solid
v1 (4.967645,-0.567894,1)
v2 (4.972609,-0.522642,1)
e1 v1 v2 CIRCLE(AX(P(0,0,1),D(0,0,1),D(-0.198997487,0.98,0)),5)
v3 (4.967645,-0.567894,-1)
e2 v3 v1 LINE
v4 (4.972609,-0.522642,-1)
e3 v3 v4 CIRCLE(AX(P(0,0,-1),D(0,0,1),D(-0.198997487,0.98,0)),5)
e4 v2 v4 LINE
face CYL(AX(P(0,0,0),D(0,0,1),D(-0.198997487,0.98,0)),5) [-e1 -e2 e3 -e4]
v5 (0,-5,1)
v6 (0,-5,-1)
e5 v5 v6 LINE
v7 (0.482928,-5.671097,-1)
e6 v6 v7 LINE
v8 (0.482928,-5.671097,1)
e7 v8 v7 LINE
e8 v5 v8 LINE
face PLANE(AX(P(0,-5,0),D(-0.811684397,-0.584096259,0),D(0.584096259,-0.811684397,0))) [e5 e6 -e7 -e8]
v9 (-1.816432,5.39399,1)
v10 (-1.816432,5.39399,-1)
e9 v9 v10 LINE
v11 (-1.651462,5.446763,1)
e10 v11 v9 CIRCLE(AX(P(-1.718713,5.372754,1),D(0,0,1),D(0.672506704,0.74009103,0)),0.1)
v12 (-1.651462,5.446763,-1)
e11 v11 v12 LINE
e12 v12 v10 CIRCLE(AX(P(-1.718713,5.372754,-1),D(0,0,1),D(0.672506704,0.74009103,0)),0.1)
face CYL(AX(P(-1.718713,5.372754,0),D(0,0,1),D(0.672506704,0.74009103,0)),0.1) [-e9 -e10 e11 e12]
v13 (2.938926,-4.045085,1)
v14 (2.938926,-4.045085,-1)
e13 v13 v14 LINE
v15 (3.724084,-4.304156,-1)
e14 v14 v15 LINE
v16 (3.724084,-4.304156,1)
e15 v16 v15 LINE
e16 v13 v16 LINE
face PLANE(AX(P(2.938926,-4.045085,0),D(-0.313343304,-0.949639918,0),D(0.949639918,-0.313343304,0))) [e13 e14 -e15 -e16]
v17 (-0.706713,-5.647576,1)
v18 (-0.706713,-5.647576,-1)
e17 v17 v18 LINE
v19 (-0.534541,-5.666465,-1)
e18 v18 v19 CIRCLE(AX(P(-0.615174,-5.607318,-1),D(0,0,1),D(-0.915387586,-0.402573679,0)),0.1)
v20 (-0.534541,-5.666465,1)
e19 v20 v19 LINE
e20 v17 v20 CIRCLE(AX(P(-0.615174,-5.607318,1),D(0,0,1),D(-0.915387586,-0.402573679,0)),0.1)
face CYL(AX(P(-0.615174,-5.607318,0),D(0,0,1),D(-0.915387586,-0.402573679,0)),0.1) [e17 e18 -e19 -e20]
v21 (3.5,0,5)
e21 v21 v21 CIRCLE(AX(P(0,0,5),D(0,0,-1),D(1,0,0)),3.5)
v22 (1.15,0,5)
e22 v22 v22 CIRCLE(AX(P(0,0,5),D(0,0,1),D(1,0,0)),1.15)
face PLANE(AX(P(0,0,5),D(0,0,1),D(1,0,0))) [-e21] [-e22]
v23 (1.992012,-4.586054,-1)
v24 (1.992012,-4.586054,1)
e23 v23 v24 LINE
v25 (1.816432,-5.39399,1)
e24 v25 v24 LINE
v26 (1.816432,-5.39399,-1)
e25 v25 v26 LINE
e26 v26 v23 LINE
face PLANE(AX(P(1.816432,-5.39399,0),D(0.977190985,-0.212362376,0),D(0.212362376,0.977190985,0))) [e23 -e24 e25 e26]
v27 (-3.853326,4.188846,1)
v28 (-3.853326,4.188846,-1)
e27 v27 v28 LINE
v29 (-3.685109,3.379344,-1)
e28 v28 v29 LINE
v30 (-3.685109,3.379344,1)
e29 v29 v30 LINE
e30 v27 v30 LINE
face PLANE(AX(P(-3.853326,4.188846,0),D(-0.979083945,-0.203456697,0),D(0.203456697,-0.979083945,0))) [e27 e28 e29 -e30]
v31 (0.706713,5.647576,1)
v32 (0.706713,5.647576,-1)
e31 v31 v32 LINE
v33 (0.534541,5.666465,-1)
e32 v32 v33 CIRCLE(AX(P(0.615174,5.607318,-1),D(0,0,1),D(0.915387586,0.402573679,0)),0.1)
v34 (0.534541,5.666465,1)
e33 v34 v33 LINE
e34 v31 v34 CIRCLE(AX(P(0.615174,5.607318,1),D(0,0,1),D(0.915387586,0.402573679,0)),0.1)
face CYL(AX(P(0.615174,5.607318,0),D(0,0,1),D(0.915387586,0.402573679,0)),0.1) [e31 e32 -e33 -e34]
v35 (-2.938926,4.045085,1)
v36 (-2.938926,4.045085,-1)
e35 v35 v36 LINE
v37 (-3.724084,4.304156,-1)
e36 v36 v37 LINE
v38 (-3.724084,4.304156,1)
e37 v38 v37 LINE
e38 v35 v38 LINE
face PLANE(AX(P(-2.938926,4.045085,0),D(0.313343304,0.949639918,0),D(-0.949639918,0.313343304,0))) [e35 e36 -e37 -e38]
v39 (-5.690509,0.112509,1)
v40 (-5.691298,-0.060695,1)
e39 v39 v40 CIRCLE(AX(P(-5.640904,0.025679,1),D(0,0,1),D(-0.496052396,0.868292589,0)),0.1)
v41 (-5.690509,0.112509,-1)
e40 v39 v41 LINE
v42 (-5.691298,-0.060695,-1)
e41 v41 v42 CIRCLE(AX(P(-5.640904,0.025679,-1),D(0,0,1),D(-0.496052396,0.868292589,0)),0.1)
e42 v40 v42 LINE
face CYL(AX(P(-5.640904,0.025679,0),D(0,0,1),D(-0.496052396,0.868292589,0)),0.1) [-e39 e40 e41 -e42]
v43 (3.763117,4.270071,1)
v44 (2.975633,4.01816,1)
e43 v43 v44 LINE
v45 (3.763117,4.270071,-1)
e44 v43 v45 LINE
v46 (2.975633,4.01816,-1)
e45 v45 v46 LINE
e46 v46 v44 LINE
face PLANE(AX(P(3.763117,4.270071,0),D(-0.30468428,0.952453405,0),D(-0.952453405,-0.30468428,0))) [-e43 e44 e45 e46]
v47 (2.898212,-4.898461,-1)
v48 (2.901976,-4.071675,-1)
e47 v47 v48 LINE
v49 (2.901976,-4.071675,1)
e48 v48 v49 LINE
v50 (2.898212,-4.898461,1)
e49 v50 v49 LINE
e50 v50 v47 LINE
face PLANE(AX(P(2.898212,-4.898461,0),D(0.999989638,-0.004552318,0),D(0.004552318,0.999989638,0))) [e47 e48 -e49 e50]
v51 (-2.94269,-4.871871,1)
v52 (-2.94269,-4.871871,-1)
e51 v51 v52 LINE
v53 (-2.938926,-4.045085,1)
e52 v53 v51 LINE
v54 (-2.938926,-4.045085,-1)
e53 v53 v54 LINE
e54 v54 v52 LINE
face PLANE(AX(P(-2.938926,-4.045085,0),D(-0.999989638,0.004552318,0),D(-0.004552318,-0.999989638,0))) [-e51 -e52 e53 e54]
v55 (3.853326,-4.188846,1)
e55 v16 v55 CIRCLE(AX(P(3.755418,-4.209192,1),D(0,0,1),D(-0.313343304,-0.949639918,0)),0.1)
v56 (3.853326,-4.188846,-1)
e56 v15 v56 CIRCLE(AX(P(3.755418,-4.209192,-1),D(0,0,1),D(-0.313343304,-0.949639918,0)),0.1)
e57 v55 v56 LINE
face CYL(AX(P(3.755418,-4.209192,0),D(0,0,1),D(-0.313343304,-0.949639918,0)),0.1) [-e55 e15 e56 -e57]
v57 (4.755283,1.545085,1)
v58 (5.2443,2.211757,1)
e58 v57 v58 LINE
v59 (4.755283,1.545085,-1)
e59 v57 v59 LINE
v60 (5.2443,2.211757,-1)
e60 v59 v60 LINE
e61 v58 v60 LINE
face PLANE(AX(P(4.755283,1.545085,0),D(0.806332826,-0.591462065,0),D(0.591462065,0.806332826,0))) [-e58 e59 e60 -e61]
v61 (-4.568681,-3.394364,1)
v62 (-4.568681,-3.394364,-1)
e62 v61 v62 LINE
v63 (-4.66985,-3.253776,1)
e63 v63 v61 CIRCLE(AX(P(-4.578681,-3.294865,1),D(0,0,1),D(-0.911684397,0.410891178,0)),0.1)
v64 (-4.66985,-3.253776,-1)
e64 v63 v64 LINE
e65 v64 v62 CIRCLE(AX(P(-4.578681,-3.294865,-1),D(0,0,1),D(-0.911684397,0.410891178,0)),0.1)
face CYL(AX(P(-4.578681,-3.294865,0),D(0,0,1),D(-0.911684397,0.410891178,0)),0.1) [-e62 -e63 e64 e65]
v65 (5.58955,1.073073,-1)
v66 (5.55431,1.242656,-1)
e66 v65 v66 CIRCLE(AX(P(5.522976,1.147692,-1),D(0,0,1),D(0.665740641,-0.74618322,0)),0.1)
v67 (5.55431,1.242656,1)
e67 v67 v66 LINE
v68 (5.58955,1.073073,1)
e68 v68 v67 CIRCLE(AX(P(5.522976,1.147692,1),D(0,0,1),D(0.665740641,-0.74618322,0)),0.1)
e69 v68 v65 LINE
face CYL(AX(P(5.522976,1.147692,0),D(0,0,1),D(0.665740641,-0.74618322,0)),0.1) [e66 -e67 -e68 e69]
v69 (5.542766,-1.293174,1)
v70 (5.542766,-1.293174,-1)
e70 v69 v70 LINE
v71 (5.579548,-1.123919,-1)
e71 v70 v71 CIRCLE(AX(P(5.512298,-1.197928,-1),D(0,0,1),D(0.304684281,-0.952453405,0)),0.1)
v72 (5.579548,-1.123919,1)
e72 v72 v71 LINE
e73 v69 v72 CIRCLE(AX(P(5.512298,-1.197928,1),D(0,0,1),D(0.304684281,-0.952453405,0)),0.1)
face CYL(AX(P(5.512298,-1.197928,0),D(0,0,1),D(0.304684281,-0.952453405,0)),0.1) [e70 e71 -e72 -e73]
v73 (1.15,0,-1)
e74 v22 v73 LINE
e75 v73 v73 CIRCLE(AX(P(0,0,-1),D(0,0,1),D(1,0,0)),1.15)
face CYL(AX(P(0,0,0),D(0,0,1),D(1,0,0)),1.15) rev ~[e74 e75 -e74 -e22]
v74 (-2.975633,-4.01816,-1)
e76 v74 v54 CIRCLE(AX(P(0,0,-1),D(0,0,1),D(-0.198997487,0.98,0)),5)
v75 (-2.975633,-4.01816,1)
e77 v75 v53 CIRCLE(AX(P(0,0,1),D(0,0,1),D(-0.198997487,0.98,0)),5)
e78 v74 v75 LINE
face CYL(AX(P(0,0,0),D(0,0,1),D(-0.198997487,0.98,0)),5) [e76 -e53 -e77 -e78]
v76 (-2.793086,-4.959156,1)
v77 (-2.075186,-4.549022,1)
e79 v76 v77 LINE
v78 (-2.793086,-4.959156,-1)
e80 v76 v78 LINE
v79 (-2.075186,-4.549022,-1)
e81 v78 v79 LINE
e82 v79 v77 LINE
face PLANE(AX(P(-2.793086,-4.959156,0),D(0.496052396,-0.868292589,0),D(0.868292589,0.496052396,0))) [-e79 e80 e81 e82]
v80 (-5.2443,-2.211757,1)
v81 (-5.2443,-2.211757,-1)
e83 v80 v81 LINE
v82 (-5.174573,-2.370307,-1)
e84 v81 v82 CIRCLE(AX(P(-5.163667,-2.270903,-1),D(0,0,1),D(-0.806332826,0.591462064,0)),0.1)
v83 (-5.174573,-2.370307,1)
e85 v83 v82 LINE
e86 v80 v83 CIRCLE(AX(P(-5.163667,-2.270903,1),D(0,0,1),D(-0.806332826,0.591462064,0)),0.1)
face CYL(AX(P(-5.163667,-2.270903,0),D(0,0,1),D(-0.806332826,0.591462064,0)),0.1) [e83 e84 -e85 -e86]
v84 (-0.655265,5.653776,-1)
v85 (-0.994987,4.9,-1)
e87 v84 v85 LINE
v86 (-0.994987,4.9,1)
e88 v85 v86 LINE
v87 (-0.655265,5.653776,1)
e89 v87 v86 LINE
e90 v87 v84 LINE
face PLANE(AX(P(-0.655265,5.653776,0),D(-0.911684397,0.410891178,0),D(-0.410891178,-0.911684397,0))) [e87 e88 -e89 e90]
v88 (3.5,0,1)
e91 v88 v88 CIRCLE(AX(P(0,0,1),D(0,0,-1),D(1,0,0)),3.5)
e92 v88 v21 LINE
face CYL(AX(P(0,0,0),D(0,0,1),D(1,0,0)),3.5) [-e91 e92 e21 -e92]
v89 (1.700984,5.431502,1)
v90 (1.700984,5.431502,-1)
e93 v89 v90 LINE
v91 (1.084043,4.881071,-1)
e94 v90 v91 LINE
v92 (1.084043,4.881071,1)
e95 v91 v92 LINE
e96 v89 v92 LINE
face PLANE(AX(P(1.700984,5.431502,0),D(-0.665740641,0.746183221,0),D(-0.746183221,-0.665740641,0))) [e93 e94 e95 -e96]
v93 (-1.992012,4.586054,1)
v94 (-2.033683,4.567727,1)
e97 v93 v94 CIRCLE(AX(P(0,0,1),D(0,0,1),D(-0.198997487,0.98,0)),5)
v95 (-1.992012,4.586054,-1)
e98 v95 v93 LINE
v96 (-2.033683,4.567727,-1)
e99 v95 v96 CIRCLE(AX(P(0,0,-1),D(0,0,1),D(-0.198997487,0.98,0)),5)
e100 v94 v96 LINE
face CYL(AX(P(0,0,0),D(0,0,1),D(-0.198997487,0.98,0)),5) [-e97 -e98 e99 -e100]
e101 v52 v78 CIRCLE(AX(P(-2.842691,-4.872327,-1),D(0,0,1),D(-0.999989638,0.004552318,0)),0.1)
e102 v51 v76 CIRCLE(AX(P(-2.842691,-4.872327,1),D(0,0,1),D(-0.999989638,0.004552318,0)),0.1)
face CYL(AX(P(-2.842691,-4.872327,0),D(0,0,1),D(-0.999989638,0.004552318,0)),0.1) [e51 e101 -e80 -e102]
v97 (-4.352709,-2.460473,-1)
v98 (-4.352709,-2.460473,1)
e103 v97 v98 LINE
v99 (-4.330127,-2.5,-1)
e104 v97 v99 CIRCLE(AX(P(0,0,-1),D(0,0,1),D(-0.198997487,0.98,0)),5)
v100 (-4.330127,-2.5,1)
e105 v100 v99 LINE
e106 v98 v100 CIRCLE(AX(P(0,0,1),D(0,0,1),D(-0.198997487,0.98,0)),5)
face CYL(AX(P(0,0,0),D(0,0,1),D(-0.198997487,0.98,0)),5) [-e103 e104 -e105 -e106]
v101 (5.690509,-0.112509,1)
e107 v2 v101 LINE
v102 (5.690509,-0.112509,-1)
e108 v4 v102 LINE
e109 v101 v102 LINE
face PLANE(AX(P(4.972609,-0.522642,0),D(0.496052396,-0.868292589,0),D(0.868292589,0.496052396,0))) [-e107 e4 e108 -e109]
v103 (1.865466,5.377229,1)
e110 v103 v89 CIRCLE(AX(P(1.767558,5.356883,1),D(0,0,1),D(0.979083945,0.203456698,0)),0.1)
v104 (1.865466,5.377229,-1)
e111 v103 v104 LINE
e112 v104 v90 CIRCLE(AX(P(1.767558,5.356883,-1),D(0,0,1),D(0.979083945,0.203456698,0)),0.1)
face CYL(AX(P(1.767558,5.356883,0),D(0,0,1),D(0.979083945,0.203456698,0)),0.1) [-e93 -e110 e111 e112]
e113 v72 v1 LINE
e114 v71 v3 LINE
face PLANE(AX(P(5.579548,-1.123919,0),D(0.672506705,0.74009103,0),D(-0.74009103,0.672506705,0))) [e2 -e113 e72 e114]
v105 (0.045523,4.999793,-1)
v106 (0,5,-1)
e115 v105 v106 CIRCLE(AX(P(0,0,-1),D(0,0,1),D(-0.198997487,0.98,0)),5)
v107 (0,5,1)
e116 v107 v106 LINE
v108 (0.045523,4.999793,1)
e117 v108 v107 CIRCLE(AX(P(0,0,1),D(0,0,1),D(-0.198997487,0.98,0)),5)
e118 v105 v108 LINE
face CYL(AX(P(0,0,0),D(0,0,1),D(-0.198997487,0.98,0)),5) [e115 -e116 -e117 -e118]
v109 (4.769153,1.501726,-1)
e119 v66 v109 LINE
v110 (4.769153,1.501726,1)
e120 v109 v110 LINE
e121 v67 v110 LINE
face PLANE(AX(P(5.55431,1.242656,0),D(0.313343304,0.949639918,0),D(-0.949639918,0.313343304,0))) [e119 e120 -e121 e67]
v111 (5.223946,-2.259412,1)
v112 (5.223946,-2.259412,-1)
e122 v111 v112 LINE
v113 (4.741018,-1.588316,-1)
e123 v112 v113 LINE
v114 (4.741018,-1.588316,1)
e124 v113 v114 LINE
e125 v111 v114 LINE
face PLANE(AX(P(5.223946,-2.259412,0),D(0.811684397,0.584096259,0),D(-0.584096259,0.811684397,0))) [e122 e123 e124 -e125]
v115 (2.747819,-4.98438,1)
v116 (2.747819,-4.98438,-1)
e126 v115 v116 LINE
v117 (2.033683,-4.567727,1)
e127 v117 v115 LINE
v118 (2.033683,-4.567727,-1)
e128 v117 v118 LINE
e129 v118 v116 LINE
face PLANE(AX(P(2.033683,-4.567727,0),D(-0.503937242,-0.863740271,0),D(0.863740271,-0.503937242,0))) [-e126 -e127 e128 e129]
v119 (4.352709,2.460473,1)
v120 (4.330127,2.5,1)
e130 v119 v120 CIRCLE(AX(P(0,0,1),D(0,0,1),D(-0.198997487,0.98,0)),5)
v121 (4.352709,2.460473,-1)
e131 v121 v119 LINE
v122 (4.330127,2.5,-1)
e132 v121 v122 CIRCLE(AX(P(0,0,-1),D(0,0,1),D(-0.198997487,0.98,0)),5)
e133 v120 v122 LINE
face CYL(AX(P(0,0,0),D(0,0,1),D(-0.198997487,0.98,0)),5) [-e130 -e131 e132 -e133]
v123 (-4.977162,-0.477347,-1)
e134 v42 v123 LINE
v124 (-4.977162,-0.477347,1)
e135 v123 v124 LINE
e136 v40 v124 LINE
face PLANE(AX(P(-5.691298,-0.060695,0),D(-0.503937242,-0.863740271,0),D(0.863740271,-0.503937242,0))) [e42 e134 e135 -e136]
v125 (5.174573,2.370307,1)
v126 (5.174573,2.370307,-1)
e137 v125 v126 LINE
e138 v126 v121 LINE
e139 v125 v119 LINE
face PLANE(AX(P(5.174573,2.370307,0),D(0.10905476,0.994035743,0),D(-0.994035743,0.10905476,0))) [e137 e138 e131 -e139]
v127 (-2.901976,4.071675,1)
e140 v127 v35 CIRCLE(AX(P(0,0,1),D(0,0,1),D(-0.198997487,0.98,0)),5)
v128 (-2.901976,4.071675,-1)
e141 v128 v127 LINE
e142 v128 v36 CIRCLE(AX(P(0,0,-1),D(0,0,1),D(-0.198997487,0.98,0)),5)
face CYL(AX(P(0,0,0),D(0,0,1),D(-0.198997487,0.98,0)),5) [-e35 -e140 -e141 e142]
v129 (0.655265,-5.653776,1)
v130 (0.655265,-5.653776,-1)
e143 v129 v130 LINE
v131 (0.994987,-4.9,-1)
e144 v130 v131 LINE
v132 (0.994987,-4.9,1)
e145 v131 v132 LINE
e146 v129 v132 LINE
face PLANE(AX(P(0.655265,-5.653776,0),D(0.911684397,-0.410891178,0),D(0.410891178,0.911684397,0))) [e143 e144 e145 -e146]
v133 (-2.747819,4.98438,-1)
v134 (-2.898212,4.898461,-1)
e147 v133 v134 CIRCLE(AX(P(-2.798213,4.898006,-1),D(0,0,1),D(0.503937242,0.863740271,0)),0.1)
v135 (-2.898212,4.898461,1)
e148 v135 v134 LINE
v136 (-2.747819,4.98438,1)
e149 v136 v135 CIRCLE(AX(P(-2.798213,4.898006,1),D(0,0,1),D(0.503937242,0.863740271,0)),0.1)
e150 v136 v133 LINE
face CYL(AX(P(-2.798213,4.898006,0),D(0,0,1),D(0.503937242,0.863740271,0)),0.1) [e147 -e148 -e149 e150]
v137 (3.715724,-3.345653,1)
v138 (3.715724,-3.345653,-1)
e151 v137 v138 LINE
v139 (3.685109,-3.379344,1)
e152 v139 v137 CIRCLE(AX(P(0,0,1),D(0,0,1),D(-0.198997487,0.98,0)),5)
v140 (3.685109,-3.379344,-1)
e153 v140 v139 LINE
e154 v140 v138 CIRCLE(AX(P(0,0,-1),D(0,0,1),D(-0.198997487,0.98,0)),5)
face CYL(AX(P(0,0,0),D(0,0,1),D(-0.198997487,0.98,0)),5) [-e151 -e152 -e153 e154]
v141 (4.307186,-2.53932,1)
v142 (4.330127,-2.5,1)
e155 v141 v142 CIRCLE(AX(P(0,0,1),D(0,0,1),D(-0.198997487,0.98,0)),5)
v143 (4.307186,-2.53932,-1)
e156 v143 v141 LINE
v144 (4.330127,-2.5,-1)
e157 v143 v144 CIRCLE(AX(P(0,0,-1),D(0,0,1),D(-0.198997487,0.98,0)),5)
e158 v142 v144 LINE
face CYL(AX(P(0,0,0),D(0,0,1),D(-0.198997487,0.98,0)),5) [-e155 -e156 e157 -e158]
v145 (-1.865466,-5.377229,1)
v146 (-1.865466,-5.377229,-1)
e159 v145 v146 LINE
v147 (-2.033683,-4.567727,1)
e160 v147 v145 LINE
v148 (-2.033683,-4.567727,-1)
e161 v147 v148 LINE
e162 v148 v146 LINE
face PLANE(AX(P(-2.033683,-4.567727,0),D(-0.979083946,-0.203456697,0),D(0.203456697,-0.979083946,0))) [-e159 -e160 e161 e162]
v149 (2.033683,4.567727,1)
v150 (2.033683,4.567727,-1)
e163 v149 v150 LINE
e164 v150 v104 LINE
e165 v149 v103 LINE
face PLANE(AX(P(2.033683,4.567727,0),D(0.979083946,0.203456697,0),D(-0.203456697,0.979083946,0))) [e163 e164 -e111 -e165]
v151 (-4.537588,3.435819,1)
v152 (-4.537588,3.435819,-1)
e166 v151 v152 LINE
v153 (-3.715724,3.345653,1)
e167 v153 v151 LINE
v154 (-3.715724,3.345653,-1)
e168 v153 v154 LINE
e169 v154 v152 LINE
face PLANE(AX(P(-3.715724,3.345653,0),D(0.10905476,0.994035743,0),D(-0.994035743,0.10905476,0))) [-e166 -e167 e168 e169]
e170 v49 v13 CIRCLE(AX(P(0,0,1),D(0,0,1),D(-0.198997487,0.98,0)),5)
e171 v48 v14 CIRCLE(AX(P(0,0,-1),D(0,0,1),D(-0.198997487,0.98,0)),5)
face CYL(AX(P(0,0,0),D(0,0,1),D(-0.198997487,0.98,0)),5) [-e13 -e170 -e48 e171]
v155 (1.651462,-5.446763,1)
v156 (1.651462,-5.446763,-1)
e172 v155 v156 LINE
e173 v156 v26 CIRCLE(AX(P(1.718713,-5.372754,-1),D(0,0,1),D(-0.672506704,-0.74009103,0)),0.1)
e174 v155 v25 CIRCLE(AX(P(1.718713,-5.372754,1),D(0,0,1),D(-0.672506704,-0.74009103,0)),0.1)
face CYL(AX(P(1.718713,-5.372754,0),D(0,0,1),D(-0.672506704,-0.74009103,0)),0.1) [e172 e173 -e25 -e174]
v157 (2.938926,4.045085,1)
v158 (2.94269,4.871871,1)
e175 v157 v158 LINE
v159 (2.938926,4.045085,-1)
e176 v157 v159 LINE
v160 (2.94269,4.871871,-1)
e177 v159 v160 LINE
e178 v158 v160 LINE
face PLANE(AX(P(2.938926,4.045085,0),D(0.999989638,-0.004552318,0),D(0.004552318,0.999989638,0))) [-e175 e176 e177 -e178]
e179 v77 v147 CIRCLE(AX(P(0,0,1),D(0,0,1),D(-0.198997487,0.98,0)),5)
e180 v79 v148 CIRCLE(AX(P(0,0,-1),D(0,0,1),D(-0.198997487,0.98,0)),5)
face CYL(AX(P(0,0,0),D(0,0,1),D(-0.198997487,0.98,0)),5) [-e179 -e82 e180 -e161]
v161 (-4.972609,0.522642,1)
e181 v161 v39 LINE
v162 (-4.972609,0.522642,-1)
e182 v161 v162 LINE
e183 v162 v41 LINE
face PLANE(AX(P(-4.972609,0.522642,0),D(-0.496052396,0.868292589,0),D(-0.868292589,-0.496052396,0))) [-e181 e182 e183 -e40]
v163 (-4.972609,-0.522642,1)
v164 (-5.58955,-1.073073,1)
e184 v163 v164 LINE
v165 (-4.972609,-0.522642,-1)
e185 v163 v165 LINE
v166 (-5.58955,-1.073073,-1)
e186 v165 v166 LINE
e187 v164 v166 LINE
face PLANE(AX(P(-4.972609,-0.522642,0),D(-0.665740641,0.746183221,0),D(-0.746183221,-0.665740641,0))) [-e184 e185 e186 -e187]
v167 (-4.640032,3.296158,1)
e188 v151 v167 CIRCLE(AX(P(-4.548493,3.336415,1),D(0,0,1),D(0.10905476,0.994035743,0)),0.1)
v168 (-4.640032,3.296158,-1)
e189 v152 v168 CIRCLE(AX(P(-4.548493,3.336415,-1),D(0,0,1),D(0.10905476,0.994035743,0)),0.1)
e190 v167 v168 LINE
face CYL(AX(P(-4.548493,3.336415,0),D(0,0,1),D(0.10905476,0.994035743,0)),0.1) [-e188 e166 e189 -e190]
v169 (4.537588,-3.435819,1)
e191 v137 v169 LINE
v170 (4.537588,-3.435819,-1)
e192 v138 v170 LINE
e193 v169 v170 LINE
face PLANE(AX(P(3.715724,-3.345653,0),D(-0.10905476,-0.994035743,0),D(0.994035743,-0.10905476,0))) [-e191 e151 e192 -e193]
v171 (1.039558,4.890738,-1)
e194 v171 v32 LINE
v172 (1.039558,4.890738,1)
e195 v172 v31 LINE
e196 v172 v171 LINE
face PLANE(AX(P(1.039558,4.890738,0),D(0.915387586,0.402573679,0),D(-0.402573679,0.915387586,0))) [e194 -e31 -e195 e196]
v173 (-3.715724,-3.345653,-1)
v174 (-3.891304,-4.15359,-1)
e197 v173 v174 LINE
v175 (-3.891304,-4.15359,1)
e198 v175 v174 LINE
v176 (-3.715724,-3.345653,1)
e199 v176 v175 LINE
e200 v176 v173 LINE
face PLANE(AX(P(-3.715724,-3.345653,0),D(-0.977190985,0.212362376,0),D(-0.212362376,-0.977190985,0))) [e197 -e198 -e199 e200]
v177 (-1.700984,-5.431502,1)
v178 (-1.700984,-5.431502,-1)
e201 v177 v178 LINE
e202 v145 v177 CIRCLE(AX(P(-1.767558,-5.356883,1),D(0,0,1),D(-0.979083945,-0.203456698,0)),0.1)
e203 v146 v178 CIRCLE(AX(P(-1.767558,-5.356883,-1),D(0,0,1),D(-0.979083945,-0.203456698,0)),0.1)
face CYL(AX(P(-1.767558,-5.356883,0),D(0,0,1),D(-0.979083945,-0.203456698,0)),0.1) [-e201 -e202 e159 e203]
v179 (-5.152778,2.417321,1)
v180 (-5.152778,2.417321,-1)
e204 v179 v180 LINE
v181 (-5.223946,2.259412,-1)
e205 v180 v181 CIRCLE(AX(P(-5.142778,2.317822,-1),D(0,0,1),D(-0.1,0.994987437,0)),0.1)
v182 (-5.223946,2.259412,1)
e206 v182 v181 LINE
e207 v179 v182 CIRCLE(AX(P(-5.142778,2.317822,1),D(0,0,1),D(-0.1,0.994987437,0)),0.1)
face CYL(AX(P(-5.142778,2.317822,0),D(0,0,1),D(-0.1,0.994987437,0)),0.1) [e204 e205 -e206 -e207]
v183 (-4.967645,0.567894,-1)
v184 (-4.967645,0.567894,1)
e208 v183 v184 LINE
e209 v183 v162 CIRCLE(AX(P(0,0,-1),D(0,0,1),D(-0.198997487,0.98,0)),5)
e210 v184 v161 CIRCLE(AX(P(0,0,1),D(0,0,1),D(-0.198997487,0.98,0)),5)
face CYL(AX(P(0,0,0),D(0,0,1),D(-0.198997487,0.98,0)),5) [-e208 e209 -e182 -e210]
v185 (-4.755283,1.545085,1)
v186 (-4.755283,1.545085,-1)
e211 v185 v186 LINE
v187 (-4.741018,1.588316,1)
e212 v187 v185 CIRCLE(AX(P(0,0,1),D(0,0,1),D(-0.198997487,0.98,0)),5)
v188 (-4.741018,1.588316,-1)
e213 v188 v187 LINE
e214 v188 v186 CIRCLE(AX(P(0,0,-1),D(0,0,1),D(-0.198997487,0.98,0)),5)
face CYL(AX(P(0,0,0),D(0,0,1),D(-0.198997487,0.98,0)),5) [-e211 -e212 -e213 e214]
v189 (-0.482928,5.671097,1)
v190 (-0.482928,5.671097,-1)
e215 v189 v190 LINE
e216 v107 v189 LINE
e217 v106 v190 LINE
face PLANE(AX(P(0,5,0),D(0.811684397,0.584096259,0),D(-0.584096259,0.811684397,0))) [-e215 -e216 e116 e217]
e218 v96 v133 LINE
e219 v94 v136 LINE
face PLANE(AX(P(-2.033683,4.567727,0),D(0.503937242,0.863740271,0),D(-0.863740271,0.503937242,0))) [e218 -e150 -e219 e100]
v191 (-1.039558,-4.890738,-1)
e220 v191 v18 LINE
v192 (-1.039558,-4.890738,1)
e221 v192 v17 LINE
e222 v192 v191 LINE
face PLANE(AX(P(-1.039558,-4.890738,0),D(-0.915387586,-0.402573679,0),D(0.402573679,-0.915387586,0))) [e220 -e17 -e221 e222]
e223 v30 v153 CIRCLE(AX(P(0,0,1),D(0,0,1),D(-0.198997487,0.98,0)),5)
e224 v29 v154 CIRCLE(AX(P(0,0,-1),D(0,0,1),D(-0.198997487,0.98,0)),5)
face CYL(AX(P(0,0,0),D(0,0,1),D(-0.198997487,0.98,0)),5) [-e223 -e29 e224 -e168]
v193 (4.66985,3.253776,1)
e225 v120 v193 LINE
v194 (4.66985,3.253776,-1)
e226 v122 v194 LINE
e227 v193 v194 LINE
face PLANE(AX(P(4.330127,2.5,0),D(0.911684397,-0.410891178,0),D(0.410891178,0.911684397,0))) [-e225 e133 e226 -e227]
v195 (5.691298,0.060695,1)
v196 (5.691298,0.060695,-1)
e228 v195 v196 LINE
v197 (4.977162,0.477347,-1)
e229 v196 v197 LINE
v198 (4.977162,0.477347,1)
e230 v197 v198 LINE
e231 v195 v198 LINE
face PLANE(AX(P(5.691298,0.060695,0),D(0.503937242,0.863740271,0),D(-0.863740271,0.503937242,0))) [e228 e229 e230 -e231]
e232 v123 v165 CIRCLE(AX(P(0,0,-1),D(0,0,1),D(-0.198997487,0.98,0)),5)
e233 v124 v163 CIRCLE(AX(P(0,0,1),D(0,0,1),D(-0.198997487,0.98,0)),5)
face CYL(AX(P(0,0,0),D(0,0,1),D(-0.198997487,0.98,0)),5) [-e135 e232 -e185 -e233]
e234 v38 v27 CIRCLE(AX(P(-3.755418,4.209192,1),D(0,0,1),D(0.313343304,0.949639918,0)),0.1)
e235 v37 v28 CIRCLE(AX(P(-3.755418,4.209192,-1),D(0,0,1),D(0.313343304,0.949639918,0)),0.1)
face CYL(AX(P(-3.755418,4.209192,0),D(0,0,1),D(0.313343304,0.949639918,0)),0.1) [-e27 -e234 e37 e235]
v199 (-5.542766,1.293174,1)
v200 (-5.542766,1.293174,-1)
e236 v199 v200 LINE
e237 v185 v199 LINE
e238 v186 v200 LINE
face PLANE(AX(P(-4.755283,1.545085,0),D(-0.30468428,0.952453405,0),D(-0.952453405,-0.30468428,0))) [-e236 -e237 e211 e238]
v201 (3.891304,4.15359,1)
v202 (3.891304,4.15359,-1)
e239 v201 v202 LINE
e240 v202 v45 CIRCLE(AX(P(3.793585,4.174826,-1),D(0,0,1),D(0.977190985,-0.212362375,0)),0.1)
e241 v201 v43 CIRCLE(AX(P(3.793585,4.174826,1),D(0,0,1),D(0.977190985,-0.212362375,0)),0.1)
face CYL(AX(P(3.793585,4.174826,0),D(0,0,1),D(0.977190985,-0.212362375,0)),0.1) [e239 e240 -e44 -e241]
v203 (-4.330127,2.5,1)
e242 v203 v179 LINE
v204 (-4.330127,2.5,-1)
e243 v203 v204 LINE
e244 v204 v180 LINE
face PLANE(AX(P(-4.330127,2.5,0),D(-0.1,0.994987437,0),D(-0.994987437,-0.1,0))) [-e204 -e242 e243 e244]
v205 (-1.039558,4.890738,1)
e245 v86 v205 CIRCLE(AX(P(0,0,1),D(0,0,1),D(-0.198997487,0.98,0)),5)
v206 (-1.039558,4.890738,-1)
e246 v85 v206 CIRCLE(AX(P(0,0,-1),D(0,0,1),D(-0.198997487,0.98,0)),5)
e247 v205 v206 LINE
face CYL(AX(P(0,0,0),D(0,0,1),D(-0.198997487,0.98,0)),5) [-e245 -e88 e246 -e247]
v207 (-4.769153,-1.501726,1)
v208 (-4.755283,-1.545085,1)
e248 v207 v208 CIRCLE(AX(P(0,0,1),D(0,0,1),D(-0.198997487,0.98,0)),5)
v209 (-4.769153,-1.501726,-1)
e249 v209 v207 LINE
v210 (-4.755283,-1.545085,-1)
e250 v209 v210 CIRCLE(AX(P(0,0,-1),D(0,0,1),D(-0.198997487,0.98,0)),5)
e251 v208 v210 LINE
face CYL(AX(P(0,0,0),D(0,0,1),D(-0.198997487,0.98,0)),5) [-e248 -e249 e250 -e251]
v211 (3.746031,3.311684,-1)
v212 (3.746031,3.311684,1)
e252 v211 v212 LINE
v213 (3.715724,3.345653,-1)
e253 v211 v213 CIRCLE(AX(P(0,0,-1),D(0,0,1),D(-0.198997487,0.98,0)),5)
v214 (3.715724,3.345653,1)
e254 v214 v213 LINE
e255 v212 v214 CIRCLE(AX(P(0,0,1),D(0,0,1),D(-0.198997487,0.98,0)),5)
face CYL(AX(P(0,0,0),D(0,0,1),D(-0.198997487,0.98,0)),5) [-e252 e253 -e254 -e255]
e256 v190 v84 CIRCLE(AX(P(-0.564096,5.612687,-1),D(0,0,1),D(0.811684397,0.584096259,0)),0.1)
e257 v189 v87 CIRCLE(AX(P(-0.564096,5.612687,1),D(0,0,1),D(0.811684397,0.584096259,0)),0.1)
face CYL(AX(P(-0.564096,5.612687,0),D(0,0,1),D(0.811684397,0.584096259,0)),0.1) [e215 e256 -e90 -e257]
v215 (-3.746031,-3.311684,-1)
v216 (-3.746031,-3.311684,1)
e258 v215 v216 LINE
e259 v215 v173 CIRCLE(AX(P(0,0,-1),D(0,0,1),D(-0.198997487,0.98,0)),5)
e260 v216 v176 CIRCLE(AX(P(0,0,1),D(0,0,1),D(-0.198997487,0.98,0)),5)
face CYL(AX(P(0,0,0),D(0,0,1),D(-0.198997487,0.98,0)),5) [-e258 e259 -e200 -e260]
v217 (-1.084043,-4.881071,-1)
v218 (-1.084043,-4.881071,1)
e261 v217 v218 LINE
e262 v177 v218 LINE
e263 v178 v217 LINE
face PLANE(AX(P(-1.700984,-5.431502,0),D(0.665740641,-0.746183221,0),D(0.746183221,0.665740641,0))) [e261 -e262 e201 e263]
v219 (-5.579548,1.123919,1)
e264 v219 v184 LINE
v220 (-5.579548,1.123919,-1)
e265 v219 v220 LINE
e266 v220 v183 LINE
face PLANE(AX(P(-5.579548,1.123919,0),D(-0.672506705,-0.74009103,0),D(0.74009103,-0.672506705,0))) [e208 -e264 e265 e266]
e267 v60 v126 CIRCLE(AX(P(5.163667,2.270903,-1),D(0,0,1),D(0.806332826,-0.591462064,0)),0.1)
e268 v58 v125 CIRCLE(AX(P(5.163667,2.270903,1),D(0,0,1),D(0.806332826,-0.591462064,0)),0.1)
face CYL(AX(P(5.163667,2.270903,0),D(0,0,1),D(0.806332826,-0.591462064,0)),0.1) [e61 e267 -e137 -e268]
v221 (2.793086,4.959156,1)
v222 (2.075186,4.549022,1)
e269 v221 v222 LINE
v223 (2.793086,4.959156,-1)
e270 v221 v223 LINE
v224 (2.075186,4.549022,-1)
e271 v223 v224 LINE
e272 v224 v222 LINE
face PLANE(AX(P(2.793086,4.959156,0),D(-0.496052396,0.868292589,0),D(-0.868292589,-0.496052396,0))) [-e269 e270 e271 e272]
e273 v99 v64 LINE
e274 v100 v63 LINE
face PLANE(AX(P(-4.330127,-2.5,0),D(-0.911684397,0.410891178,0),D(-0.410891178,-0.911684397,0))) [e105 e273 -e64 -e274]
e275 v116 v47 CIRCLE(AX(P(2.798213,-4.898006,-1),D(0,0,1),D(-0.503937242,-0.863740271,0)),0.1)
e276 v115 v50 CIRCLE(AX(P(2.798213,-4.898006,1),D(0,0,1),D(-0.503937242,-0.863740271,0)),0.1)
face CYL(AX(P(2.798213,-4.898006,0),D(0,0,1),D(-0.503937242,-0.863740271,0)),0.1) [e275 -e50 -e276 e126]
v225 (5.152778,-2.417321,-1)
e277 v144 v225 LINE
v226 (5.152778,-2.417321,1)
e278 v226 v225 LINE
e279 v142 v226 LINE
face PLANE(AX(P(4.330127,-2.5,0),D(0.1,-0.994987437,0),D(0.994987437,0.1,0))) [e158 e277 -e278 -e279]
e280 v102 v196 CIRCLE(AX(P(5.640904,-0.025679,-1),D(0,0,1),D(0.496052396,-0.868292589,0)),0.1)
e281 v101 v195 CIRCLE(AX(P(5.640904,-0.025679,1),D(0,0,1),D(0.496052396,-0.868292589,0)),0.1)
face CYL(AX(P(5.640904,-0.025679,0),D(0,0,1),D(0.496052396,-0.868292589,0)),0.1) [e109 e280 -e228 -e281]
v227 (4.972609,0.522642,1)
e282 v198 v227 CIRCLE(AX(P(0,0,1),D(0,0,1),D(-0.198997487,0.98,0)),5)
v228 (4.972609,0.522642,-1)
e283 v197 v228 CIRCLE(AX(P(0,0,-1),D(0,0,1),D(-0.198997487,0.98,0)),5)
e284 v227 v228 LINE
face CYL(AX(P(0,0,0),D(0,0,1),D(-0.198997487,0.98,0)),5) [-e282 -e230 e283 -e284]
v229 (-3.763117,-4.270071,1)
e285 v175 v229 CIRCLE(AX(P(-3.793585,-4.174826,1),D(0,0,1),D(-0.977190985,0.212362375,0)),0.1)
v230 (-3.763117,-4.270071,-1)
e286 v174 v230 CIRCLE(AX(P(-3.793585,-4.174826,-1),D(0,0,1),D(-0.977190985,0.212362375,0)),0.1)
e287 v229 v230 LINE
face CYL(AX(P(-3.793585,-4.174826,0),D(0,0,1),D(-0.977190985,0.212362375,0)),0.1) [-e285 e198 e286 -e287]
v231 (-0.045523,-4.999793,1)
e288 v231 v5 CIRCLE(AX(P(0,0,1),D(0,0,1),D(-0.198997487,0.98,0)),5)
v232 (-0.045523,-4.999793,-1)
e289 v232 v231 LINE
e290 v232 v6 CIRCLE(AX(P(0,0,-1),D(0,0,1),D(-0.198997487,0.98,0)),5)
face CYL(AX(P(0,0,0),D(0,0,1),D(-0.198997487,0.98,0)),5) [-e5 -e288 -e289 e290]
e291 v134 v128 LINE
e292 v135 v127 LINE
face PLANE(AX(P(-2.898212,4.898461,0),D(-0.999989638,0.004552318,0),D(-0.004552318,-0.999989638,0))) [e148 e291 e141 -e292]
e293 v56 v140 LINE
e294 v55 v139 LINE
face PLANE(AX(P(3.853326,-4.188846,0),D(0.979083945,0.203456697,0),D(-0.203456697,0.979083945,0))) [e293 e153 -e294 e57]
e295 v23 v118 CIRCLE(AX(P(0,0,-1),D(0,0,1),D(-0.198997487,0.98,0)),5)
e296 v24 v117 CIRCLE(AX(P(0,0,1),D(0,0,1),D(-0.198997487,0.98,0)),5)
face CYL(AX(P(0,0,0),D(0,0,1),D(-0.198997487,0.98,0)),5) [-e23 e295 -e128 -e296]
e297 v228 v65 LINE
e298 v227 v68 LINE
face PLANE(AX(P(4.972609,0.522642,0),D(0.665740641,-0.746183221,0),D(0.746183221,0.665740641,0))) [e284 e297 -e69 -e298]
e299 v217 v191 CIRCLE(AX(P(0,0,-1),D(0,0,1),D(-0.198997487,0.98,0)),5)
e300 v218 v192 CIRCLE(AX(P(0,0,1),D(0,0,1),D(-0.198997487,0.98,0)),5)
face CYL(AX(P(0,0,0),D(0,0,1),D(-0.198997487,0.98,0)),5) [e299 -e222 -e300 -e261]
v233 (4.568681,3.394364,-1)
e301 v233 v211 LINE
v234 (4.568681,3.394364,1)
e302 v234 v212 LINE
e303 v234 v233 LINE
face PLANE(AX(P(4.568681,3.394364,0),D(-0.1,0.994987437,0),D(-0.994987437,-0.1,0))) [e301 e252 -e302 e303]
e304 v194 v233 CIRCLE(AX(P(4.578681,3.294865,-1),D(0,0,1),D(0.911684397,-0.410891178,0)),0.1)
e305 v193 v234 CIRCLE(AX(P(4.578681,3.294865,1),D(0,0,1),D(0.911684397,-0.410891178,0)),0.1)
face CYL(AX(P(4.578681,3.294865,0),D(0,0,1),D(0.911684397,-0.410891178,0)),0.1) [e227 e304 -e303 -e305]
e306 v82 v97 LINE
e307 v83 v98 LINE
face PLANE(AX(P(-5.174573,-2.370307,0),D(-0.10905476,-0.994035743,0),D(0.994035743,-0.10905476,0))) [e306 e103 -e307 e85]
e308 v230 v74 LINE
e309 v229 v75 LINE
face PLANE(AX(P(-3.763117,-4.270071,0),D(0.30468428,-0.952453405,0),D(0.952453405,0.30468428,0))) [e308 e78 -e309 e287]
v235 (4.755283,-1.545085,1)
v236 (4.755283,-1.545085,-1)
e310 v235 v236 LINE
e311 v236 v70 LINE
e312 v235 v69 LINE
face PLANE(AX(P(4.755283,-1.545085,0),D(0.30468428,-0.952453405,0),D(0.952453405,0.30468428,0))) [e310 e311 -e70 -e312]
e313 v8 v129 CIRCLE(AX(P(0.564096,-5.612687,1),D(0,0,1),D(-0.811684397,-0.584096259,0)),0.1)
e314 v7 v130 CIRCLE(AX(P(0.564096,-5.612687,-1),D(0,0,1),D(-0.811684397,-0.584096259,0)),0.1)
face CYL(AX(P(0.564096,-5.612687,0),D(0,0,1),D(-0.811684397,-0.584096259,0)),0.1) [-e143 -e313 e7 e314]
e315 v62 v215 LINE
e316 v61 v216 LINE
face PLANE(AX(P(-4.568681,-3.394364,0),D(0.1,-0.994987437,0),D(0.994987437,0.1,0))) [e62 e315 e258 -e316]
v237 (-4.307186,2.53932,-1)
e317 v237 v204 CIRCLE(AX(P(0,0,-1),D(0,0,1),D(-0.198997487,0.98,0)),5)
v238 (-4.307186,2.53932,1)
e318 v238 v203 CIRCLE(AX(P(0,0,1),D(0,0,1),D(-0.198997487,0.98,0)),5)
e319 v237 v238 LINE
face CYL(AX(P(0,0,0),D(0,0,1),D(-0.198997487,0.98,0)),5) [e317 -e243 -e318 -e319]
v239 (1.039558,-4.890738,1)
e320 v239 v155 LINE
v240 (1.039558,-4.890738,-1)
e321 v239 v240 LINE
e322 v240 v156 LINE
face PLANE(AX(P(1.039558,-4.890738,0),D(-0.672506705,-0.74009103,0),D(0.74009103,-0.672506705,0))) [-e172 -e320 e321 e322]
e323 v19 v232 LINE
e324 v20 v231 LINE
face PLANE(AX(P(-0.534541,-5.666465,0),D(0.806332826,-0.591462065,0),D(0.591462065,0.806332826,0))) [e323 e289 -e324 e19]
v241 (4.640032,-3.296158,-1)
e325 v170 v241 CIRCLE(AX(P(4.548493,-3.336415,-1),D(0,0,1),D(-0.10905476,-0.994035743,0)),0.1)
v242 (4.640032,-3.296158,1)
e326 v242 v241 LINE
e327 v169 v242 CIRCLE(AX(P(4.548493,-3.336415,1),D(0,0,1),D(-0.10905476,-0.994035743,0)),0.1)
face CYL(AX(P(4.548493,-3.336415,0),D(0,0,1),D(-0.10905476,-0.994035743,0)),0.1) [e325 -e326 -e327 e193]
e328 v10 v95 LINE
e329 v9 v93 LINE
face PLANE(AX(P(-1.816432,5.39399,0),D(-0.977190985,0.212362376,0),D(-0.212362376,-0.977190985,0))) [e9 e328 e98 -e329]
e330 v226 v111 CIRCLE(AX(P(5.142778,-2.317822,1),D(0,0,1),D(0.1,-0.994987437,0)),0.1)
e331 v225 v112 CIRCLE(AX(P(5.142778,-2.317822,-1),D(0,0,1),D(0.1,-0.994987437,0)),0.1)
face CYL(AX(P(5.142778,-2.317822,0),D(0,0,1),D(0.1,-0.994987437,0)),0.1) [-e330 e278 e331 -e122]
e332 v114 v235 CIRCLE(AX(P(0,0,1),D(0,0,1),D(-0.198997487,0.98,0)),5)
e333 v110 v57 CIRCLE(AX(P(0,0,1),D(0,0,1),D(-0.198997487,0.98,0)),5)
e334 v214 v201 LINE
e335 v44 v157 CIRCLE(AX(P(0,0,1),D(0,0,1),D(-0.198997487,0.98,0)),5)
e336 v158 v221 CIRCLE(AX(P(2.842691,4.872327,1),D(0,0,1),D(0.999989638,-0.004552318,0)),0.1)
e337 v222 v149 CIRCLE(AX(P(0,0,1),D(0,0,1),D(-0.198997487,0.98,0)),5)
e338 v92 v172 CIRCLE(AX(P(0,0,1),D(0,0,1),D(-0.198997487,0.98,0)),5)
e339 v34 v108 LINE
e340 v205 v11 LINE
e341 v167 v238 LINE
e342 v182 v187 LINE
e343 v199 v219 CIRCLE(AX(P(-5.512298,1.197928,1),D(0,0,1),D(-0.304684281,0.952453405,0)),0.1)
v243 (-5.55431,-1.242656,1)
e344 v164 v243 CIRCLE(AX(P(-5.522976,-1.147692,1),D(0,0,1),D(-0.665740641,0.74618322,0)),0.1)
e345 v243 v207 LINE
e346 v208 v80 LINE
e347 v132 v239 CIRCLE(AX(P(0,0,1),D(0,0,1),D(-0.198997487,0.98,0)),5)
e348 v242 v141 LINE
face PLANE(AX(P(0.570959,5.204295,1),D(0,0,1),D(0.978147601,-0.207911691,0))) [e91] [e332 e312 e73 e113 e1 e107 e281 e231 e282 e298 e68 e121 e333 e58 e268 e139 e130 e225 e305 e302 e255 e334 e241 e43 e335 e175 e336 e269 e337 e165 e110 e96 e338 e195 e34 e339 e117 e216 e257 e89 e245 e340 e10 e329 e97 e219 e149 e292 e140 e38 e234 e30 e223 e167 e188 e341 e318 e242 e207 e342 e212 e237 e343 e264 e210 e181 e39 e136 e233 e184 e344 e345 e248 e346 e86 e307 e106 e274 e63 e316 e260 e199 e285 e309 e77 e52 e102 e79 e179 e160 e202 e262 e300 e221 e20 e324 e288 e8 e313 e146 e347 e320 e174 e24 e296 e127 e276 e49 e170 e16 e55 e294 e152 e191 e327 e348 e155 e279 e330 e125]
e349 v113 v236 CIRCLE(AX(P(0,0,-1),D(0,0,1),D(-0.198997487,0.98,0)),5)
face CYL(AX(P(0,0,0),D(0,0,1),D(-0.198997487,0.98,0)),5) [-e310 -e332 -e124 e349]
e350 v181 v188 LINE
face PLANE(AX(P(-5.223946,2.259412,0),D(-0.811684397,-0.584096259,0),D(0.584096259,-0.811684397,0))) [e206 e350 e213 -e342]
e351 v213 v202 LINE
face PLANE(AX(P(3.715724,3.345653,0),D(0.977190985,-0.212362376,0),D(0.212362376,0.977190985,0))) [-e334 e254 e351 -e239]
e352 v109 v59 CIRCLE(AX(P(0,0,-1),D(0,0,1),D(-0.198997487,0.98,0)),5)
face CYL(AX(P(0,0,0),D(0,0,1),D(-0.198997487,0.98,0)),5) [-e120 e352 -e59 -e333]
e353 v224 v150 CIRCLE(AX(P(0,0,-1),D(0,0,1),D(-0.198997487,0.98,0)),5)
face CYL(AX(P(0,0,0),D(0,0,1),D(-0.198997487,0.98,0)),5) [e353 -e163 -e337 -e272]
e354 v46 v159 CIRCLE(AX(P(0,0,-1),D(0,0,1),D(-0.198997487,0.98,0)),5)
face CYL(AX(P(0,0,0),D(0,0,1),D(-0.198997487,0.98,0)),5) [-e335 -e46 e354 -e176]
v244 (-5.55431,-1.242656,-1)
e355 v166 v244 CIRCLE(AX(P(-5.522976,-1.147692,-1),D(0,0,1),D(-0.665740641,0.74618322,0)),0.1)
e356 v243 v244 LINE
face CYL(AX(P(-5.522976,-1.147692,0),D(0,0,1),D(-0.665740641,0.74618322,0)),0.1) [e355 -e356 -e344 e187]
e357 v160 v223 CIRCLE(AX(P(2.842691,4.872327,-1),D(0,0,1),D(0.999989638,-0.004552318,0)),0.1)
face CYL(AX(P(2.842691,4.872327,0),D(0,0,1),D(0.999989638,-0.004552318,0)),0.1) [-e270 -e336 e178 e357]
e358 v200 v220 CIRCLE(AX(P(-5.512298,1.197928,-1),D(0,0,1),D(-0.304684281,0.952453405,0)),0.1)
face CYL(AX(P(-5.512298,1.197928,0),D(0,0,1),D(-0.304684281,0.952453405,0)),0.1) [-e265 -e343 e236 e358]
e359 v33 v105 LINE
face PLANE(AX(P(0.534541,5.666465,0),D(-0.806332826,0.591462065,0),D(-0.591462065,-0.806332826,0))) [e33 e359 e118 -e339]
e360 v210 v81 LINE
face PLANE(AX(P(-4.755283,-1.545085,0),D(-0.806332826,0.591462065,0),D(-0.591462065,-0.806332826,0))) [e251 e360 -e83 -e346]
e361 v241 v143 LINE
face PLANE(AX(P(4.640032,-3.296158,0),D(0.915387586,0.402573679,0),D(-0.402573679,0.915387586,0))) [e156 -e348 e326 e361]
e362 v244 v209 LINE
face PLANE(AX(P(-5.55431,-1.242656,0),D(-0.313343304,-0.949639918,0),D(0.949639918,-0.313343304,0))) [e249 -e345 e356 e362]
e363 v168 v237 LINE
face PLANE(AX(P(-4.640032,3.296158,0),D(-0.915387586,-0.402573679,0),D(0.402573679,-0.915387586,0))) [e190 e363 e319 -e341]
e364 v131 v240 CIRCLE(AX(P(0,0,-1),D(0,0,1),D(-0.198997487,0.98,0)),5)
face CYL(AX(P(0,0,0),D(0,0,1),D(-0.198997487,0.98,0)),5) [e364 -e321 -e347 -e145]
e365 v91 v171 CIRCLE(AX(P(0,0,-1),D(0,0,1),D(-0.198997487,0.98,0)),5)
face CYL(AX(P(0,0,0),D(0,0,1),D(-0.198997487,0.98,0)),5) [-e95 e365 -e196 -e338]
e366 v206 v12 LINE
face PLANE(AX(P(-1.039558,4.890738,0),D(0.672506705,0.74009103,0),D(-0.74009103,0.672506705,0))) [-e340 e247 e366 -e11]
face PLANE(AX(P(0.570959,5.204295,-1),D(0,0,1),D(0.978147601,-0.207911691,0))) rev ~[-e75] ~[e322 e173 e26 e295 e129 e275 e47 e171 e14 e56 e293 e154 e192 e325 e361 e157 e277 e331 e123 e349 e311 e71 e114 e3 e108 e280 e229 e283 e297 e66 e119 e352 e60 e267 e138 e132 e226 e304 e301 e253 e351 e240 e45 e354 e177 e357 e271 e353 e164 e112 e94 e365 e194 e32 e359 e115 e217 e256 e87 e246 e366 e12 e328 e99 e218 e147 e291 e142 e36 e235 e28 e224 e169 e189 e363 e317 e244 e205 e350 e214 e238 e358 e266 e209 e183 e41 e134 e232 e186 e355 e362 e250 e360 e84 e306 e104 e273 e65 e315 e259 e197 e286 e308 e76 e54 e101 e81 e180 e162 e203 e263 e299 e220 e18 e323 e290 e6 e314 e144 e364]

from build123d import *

# Parameters (mm, degrees)
F0_R     = 3.5
F0_R_2   = 1.15
F2_DEPTH = 5
F3_DEPTH = 1
F4_DEPTH = 1
F5_DEPTH = 1
F6_COUNT = 30


with BuildPart() as f2:
    # F0 (on Top) → F2 (new body)
    with BuildSketch(Plane.XY):
        Circle(F0_R)
        Circle(F0_R_2, mode=Mode.SUBTRACT)
    extrude(amount=F2_DEPTH)

    # F0 (on Top) → F3 (join)
    with BuildSketch(Plane.XY):
        Circle(F0_R)
        Circle(F0_R_2, mode=Mode.SUBTRACT)
    extrude(amount=-F3_DEPTH)

    # F0 (on Top) → F4 (join, symmetric)
    with BuildSketch(Plane.XY):
        with BuildLine():
            Line((0, 5), (-0.9949874371, 4.9))
            ThreePointArc((-0.9949874371, 4.9), (0.5, -4.9749371855), (0, 5))
        make_face()
        Circle(F0_R, mode=Mode.SUBTRACT)
    extrude(amount=F4_DEPTH, both=True)

    # F0 (on Top) → F5 (join, symmetric)
    with BuildSketch(Plane.XY):
        with BuildLine():
            Line((-0.6552646986, 5.6537760274), (-0.9949874371, 4.9))
            Line((-0.9949874371, 4.9), (0, 5))
            Line((0, 5), (-0.4829278192, 5.6710965355))
            ThreePointArc((-0.4829278192, 5.6710965355), (-0.5740962589, 5.7121856533), (-0.6552646986, 5.6537760274))
        make_face()
    extrude(amount=F5_DEPTH, both=True)

    # F6: F2 ×30 about axis
    f6_axis = Axis((0, 0, 13.3862942457), (0, 0, 1))


with BuildPart() as f2_1:
    add(f2.part)
    for i in range(1, F6_COUNT):
        add(f2.part.rotate(f6_axis, i * 360 / F6_COUNT))


solid = f2_1.part
